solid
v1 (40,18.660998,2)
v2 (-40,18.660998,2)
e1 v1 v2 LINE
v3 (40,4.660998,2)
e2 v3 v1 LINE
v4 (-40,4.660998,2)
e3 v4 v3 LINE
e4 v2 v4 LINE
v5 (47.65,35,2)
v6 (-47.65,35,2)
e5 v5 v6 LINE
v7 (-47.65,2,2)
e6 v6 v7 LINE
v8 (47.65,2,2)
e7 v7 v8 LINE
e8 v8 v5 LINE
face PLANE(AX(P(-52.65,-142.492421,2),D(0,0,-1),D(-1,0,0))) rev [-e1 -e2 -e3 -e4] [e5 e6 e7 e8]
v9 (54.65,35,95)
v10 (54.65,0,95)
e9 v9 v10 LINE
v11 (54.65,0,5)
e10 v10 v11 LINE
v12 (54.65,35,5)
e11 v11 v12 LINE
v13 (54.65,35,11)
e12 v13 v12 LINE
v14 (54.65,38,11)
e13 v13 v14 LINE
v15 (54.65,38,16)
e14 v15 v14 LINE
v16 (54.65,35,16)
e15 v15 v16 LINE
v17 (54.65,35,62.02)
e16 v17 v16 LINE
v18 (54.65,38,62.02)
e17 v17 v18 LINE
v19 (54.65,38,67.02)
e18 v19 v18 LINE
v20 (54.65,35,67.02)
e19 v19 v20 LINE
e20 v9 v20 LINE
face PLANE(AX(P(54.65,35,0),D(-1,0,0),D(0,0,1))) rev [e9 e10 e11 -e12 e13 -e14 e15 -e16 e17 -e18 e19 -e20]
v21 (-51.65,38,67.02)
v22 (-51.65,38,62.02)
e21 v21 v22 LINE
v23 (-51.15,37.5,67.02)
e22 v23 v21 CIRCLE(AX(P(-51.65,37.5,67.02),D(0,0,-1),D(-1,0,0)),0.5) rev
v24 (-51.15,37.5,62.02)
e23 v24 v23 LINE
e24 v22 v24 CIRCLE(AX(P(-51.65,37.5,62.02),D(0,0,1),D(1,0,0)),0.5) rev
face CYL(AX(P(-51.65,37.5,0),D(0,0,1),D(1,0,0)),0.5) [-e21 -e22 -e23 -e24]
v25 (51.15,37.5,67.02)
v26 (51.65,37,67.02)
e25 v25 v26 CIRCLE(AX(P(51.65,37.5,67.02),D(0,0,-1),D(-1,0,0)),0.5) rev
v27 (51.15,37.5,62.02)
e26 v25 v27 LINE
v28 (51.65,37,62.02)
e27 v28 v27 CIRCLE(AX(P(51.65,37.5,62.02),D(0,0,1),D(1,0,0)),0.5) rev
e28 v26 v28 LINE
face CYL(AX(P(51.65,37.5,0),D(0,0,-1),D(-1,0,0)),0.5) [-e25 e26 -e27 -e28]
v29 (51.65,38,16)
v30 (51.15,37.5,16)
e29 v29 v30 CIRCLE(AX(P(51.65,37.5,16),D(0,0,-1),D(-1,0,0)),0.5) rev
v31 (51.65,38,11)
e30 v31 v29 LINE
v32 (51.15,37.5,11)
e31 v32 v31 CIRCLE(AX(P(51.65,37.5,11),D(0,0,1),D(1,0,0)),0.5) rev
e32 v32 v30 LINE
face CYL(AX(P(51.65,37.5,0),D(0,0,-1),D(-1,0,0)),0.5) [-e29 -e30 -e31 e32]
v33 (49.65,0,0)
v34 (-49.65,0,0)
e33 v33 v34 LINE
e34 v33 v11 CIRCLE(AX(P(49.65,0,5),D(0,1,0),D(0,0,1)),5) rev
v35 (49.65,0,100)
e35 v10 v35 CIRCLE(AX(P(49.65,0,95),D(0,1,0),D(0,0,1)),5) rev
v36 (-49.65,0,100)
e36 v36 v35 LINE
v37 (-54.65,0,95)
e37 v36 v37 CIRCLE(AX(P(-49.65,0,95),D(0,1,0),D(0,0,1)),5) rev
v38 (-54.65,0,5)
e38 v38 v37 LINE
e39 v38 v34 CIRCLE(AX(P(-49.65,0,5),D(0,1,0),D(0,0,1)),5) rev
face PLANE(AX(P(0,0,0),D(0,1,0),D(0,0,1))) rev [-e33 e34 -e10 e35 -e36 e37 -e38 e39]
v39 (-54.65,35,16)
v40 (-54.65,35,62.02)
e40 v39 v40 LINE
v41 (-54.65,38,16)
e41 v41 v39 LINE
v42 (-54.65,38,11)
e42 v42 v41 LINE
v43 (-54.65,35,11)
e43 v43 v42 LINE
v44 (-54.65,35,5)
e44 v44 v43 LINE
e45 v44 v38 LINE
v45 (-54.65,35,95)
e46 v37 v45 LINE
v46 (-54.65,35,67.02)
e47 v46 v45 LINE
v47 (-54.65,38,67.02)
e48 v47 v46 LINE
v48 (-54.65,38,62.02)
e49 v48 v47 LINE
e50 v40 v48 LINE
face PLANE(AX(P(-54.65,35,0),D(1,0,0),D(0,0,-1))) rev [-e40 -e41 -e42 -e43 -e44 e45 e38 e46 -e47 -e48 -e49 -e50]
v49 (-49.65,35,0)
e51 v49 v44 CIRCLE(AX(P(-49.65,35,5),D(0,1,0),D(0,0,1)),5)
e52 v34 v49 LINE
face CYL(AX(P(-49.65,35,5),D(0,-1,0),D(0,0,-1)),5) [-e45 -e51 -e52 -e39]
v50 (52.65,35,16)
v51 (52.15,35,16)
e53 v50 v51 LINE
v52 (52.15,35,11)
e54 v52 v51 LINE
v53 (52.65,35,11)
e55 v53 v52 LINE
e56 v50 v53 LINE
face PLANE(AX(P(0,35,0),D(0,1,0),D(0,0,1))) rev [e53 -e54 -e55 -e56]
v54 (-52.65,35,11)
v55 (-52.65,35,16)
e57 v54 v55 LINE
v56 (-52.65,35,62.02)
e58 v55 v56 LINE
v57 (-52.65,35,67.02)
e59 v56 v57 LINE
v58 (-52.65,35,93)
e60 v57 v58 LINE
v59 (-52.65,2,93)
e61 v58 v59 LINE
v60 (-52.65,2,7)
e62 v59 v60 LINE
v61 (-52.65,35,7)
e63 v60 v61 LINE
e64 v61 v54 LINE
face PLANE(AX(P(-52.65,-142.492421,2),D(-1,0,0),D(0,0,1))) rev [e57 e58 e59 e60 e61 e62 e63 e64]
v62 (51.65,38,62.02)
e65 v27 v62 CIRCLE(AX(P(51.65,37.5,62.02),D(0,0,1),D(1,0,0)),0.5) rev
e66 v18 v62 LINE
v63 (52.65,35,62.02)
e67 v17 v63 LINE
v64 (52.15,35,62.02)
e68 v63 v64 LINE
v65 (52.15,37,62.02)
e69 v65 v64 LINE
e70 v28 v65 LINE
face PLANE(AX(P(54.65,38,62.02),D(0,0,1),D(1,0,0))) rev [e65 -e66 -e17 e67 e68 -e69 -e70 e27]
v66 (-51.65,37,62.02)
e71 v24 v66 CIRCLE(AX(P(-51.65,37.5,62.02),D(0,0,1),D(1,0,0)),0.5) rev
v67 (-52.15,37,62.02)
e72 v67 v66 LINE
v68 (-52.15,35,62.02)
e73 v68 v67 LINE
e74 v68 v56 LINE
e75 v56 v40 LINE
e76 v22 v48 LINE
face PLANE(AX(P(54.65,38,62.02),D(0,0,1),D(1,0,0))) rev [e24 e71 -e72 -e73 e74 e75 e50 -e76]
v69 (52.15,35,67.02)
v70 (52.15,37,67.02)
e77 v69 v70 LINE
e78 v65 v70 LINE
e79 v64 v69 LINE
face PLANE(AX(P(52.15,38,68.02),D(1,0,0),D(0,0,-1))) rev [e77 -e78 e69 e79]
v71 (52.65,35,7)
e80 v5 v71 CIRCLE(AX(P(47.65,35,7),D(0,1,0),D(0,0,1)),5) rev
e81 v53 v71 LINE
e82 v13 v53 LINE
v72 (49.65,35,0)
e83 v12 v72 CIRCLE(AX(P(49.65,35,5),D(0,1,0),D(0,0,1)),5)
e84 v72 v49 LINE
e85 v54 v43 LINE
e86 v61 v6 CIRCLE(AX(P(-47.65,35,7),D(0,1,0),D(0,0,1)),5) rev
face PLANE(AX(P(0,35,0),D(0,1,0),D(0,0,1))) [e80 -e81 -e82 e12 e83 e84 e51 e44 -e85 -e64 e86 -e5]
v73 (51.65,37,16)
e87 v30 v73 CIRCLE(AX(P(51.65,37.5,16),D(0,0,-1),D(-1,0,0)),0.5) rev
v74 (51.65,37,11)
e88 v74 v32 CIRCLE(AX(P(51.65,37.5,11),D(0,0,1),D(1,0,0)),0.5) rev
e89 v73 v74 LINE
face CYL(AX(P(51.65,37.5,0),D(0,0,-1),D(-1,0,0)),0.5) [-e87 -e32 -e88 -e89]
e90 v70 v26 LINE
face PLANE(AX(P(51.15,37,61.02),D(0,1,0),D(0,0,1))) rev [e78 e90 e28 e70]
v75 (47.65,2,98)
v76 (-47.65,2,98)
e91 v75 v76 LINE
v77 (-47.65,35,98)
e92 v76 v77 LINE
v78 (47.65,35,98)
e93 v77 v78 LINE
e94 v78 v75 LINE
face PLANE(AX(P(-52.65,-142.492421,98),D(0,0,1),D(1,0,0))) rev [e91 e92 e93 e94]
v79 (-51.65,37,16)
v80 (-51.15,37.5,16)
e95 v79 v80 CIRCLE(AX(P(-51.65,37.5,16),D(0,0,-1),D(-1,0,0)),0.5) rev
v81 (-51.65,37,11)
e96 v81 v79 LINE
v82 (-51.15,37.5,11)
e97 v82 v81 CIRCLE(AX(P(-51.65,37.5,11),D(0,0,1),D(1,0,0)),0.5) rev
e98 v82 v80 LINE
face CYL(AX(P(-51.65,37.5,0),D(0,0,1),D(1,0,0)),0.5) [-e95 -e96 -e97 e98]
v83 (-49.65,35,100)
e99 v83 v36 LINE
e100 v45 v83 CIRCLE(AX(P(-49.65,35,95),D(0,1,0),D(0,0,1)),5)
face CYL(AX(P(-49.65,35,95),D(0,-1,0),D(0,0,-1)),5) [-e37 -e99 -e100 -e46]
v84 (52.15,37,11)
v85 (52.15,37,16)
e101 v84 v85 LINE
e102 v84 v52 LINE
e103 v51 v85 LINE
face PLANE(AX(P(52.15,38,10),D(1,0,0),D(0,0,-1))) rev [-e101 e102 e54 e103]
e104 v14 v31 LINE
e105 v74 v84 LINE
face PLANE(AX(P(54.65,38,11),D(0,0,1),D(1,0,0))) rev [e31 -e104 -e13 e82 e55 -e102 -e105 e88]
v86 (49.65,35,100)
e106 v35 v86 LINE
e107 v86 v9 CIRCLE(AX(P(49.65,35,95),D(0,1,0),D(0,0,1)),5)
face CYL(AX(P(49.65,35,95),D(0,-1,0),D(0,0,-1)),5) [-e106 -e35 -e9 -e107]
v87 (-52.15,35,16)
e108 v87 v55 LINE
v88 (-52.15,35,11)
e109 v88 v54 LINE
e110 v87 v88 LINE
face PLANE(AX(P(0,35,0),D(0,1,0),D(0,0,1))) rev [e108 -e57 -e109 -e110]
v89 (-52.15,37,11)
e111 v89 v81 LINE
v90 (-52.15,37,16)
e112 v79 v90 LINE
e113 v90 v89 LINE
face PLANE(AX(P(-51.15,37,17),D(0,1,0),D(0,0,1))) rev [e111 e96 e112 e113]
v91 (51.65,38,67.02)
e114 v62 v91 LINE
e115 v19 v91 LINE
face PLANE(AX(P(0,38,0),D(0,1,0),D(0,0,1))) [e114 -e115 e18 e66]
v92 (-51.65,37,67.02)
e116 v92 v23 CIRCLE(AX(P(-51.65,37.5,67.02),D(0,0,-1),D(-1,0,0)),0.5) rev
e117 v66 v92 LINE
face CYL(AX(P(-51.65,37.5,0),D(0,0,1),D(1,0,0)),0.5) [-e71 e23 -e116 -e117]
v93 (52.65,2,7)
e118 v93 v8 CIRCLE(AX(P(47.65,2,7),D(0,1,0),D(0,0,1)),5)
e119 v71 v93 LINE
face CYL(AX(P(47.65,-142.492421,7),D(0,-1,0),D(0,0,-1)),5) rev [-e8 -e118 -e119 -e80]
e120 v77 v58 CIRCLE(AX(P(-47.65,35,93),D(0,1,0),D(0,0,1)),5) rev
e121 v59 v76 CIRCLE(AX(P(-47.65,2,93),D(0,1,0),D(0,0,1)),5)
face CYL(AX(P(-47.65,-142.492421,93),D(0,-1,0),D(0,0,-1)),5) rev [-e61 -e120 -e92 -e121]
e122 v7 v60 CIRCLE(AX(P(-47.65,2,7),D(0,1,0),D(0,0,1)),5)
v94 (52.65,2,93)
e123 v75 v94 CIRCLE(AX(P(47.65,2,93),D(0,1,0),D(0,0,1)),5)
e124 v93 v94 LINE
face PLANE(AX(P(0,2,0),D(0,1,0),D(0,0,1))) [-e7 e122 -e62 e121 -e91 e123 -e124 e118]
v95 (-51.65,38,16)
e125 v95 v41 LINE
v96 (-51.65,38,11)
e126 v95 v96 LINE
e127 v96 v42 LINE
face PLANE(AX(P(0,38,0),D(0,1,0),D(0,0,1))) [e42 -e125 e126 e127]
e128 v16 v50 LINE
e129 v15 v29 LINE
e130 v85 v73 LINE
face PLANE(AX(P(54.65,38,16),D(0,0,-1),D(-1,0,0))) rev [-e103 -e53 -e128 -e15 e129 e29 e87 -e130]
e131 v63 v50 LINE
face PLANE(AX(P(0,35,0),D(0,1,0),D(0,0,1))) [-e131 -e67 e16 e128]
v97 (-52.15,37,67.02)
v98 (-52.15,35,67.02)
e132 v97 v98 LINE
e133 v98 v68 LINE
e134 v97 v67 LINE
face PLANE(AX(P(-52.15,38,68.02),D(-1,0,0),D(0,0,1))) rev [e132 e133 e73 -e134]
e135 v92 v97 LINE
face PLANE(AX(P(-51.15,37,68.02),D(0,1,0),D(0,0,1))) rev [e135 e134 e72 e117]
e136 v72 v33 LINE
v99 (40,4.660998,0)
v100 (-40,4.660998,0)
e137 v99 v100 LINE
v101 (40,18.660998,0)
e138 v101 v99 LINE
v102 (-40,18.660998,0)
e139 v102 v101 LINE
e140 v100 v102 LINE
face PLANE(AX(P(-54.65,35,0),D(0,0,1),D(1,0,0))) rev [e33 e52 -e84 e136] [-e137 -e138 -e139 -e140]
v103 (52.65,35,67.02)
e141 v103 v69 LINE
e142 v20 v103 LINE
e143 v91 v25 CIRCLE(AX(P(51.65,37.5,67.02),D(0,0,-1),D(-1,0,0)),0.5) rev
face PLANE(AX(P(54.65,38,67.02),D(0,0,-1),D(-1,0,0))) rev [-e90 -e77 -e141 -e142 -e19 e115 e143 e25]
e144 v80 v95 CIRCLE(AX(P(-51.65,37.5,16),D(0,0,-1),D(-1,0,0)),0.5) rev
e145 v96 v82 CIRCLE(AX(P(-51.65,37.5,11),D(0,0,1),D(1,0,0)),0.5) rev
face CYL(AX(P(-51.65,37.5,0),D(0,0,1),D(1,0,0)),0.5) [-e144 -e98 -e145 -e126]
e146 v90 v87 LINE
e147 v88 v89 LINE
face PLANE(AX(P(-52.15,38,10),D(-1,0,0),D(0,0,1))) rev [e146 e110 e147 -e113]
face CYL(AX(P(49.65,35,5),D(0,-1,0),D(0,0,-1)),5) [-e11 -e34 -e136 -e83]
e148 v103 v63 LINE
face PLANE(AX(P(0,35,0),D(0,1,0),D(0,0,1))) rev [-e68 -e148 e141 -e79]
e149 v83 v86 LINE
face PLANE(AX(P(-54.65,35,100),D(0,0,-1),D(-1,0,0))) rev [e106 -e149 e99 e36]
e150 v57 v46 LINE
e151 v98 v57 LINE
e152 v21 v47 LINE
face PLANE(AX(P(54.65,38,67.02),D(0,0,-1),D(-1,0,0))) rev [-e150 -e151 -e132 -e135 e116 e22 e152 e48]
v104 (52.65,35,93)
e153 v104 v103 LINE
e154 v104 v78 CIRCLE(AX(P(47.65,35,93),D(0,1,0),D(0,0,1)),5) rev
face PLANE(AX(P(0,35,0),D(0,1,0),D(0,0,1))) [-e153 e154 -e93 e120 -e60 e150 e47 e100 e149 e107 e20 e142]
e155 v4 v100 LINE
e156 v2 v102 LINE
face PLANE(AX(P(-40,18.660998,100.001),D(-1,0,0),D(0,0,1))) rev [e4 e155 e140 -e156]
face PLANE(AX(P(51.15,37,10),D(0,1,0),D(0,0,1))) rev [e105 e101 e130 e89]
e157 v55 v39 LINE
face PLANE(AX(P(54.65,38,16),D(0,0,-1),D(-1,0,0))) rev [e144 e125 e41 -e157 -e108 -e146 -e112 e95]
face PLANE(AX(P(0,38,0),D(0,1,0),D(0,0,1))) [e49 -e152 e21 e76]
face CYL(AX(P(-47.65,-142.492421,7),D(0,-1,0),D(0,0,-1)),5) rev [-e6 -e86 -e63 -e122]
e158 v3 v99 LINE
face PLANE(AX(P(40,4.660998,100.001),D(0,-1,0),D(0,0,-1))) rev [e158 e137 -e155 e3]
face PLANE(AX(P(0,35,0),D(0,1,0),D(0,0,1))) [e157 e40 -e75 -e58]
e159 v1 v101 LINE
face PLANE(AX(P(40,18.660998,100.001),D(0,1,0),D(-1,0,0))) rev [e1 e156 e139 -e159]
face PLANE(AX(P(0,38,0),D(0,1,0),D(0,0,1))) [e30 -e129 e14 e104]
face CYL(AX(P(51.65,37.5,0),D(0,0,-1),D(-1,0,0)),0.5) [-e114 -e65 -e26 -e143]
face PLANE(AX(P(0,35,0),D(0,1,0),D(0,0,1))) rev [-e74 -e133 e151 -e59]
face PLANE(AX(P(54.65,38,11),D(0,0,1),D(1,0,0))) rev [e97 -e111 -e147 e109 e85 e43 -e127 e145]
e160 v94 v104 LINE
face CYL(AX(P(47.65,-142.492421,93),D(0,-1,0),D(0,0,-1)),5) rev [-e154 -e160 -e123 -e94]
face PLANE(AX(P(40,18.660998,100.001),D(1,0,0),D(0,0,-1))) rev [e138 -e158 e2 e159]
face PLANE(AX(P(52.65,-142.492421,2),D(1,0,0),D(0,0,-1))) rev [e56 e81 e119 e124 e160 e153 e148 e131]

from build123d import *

# Parameters (mm, degrees)
SKETCH1_W           = 109.3
SKETCH1_H           = 100
BOSS_EXTRUDE1_DEPTH = 35
SKETCH2_W           = 2.5
SKETCH2_H           = 7
BOSS_EXTRUDE2_DEPTH = 3
SKETCH3_W           = 7
SKETCH3_H           = 1
BOSS_EXTRUDE3_DEPTH = 1
SKETCH4_W           = 7
SKETCH4_H           = 1
BOSS_EXTRUDE4_DEPTH = 1
FILLET1_R           = 0.5
SKETCH5_W           = 105.3
SKETCH5_H           = 96
CUT_EXTRUDE1_DEPTH  = 33
FILLET2_R           = 5
SKETCH6_W           = 1
SKETCH6_H           = 3
CUT_EXTRUDE2_DEPTH  = 153.939497841
CUT_EXTRUDE3_REACH  = 122.128
SKETCH7_W           = 80
SKETCH7_H           = 14


with BuildPart() as part:
    # Sketch1 → Boss-Extrude1 (new body)
    with BuildSketch(Plane(origin=(0, 0, 0), x_dir=(1, 0, 0), z_dir=(0, 1, 0))):
        with Locations((0, -50)):
            Rectangle(SKETCH1_W, SKETCH1_H)
    extrude(amount=BOSS_EXTRUDE1_DEPTH)

    # Sketch2 → Boss-Extrude2 (add)
    with BuildSketch(Plane(origin=(0, 35, 0), x_dir=(1, 0, 0), z_dir=(0, 1, 0))):
        with Locations((-53.4, -13.5)):
            Rectangle(SKETCH2_W, SKETCH2_H)
        with Locations((53.4, -13.5)):
            Rectangle(SKETCH2_W, SKETCH2_H)
        with Locations((53.4, -64.52)):
            Rectangle(SKETCH2_W, SKETCH2_H)
        with Locations((-53.4, -64.52)):
            Rectangle(SKETCH2_W, SKETCH2_H)
    extrude(amount=BOSS_EXTRUDE2_DEPTH)

    # Sketch3 → Boss-Extrude3 (add)
    with BuildSketch(Plane(origin=(-52.15, 0, 0), x_dir=(0, 0, -1), z_dir=(1, 0, 0))):
        with Locations((-13.5, 37.5)):
            Rectangle(SKETCH3_W, SKETCH3_H)
        with Locations((-64.52, 37.5)):
            Rectangle(SKETCH3_W, SKETCH3_H)
    extrude(amount=BOSS_EXTRUDE3_DEPTH)

    # Sketch4 → Boss-Extrude4 (add)
    with BuildSketch(Plane.ZY.offset(-52.15)):
        with Locations((13.5, 37.5)):
            Rectangle(SKETCH4_W, SKETCH4_H)
        with Locations((64.52, 37.5)):
            Rectangle(SKETCH4_W, SKETCH4_H)
    extrude(amount=BOSS_EXTRUDE4_DEPTH)

    # Fillet1
    fillet1_edges = [part.edges().sort_by_distance(p)[0] for p in [
        (51.15, 38, 13.5),
        (51.15, 37, 13.5),
        (51.15, 37, 64.52),
        (51.15, 38, 64.52),
        (-51.15, 37, 13.5),
        (-51.15, 38, 13.5),
        (-51.15, 37, 64.52),
        (-51.15, 38, 64.52),
    ]]
    fillet(fillet1_edges, radius=FILLET1_R - 0.0001)  # a hair under: the kernel refuses the full size

    # Sketch5 → Cut-Extrude1 (cut)
    with BuildSketch(Plane(origin=(0, 35, 0), x_dir=(1, 0, 0), z_dir=(0, 1, 0))):
        with Locations((0, -50)):
            Rectangle(SKETCH5_W, SKETCH5_H)
    extrude(amount=-CUT_EXTRUDE1_DEPTH, mode=Mode.SUBTRACT)

    # Fillet2
    fillet2_edges = [part.edges().sort_by_distance(p)[0] for p in [
        (-52.65, 18.5, 98),
        (-52.65, 18.5, 2),
        (52.65, 18.5, 2),
        (52.65, 18.5, 98),
        (-54.65, 17.5, 0),
        (54.65, 17.5, 0),
        (54.65, 17.5, 100),
        (-54.65, 17.5, 100),
    ]]
    fillet(fillet2_edges, radius=FILLET2_R)

    # Sketch6 → Cut-Extrude2 (cut, through all)
    with BuildSketch(Plane.ZY.offset(54.65)):
        with Locations((10.5, 36.5)):
            Rectangle(SKETCH6_W, SKETCH6_H)
        with Locations((16.5, 36.5)):
            Rectangle(SKETCH6_W, SKETCH6_H)
        with Locations((61.52, 36.5)):
            Rectangle(SKETCH6_W, SKETCH6_H)
        with Locations((67.52, 36.5)):
            Rectangle(SKETCH6_W, SKETCH6_H)
    extrude(amount=-CUT_EXTRUDE2_DEPTH, mode=Mode.SUBTRACT)

    # Sketch7 → Cut-Extrude3 (cut, up to next)
    with BuildSketch(Plane(origin=(0, 0, 0), x_dir=(-1, 0, 0), z_dir=(0, 0, -1)), mode=Mode.PRIVATE) as cut_extrude3_sk1:
        with Locations((0, 11.66099816)):
            Rectangle(SKETCH7_W, SKETCH7_H)
    cut_extrude3_tool1 = extrude(cut_extrude3_sk1.sketch, amount=-CUT_EXTRUDE3_REACH, mode=Mode.PRIVATE) & part.part
    add(cut_extrude3_tool1.solids().sort_by_distance((0, 11.660998, 0))[0], mode=Mode.SUBTRACT)


solid = part.part
